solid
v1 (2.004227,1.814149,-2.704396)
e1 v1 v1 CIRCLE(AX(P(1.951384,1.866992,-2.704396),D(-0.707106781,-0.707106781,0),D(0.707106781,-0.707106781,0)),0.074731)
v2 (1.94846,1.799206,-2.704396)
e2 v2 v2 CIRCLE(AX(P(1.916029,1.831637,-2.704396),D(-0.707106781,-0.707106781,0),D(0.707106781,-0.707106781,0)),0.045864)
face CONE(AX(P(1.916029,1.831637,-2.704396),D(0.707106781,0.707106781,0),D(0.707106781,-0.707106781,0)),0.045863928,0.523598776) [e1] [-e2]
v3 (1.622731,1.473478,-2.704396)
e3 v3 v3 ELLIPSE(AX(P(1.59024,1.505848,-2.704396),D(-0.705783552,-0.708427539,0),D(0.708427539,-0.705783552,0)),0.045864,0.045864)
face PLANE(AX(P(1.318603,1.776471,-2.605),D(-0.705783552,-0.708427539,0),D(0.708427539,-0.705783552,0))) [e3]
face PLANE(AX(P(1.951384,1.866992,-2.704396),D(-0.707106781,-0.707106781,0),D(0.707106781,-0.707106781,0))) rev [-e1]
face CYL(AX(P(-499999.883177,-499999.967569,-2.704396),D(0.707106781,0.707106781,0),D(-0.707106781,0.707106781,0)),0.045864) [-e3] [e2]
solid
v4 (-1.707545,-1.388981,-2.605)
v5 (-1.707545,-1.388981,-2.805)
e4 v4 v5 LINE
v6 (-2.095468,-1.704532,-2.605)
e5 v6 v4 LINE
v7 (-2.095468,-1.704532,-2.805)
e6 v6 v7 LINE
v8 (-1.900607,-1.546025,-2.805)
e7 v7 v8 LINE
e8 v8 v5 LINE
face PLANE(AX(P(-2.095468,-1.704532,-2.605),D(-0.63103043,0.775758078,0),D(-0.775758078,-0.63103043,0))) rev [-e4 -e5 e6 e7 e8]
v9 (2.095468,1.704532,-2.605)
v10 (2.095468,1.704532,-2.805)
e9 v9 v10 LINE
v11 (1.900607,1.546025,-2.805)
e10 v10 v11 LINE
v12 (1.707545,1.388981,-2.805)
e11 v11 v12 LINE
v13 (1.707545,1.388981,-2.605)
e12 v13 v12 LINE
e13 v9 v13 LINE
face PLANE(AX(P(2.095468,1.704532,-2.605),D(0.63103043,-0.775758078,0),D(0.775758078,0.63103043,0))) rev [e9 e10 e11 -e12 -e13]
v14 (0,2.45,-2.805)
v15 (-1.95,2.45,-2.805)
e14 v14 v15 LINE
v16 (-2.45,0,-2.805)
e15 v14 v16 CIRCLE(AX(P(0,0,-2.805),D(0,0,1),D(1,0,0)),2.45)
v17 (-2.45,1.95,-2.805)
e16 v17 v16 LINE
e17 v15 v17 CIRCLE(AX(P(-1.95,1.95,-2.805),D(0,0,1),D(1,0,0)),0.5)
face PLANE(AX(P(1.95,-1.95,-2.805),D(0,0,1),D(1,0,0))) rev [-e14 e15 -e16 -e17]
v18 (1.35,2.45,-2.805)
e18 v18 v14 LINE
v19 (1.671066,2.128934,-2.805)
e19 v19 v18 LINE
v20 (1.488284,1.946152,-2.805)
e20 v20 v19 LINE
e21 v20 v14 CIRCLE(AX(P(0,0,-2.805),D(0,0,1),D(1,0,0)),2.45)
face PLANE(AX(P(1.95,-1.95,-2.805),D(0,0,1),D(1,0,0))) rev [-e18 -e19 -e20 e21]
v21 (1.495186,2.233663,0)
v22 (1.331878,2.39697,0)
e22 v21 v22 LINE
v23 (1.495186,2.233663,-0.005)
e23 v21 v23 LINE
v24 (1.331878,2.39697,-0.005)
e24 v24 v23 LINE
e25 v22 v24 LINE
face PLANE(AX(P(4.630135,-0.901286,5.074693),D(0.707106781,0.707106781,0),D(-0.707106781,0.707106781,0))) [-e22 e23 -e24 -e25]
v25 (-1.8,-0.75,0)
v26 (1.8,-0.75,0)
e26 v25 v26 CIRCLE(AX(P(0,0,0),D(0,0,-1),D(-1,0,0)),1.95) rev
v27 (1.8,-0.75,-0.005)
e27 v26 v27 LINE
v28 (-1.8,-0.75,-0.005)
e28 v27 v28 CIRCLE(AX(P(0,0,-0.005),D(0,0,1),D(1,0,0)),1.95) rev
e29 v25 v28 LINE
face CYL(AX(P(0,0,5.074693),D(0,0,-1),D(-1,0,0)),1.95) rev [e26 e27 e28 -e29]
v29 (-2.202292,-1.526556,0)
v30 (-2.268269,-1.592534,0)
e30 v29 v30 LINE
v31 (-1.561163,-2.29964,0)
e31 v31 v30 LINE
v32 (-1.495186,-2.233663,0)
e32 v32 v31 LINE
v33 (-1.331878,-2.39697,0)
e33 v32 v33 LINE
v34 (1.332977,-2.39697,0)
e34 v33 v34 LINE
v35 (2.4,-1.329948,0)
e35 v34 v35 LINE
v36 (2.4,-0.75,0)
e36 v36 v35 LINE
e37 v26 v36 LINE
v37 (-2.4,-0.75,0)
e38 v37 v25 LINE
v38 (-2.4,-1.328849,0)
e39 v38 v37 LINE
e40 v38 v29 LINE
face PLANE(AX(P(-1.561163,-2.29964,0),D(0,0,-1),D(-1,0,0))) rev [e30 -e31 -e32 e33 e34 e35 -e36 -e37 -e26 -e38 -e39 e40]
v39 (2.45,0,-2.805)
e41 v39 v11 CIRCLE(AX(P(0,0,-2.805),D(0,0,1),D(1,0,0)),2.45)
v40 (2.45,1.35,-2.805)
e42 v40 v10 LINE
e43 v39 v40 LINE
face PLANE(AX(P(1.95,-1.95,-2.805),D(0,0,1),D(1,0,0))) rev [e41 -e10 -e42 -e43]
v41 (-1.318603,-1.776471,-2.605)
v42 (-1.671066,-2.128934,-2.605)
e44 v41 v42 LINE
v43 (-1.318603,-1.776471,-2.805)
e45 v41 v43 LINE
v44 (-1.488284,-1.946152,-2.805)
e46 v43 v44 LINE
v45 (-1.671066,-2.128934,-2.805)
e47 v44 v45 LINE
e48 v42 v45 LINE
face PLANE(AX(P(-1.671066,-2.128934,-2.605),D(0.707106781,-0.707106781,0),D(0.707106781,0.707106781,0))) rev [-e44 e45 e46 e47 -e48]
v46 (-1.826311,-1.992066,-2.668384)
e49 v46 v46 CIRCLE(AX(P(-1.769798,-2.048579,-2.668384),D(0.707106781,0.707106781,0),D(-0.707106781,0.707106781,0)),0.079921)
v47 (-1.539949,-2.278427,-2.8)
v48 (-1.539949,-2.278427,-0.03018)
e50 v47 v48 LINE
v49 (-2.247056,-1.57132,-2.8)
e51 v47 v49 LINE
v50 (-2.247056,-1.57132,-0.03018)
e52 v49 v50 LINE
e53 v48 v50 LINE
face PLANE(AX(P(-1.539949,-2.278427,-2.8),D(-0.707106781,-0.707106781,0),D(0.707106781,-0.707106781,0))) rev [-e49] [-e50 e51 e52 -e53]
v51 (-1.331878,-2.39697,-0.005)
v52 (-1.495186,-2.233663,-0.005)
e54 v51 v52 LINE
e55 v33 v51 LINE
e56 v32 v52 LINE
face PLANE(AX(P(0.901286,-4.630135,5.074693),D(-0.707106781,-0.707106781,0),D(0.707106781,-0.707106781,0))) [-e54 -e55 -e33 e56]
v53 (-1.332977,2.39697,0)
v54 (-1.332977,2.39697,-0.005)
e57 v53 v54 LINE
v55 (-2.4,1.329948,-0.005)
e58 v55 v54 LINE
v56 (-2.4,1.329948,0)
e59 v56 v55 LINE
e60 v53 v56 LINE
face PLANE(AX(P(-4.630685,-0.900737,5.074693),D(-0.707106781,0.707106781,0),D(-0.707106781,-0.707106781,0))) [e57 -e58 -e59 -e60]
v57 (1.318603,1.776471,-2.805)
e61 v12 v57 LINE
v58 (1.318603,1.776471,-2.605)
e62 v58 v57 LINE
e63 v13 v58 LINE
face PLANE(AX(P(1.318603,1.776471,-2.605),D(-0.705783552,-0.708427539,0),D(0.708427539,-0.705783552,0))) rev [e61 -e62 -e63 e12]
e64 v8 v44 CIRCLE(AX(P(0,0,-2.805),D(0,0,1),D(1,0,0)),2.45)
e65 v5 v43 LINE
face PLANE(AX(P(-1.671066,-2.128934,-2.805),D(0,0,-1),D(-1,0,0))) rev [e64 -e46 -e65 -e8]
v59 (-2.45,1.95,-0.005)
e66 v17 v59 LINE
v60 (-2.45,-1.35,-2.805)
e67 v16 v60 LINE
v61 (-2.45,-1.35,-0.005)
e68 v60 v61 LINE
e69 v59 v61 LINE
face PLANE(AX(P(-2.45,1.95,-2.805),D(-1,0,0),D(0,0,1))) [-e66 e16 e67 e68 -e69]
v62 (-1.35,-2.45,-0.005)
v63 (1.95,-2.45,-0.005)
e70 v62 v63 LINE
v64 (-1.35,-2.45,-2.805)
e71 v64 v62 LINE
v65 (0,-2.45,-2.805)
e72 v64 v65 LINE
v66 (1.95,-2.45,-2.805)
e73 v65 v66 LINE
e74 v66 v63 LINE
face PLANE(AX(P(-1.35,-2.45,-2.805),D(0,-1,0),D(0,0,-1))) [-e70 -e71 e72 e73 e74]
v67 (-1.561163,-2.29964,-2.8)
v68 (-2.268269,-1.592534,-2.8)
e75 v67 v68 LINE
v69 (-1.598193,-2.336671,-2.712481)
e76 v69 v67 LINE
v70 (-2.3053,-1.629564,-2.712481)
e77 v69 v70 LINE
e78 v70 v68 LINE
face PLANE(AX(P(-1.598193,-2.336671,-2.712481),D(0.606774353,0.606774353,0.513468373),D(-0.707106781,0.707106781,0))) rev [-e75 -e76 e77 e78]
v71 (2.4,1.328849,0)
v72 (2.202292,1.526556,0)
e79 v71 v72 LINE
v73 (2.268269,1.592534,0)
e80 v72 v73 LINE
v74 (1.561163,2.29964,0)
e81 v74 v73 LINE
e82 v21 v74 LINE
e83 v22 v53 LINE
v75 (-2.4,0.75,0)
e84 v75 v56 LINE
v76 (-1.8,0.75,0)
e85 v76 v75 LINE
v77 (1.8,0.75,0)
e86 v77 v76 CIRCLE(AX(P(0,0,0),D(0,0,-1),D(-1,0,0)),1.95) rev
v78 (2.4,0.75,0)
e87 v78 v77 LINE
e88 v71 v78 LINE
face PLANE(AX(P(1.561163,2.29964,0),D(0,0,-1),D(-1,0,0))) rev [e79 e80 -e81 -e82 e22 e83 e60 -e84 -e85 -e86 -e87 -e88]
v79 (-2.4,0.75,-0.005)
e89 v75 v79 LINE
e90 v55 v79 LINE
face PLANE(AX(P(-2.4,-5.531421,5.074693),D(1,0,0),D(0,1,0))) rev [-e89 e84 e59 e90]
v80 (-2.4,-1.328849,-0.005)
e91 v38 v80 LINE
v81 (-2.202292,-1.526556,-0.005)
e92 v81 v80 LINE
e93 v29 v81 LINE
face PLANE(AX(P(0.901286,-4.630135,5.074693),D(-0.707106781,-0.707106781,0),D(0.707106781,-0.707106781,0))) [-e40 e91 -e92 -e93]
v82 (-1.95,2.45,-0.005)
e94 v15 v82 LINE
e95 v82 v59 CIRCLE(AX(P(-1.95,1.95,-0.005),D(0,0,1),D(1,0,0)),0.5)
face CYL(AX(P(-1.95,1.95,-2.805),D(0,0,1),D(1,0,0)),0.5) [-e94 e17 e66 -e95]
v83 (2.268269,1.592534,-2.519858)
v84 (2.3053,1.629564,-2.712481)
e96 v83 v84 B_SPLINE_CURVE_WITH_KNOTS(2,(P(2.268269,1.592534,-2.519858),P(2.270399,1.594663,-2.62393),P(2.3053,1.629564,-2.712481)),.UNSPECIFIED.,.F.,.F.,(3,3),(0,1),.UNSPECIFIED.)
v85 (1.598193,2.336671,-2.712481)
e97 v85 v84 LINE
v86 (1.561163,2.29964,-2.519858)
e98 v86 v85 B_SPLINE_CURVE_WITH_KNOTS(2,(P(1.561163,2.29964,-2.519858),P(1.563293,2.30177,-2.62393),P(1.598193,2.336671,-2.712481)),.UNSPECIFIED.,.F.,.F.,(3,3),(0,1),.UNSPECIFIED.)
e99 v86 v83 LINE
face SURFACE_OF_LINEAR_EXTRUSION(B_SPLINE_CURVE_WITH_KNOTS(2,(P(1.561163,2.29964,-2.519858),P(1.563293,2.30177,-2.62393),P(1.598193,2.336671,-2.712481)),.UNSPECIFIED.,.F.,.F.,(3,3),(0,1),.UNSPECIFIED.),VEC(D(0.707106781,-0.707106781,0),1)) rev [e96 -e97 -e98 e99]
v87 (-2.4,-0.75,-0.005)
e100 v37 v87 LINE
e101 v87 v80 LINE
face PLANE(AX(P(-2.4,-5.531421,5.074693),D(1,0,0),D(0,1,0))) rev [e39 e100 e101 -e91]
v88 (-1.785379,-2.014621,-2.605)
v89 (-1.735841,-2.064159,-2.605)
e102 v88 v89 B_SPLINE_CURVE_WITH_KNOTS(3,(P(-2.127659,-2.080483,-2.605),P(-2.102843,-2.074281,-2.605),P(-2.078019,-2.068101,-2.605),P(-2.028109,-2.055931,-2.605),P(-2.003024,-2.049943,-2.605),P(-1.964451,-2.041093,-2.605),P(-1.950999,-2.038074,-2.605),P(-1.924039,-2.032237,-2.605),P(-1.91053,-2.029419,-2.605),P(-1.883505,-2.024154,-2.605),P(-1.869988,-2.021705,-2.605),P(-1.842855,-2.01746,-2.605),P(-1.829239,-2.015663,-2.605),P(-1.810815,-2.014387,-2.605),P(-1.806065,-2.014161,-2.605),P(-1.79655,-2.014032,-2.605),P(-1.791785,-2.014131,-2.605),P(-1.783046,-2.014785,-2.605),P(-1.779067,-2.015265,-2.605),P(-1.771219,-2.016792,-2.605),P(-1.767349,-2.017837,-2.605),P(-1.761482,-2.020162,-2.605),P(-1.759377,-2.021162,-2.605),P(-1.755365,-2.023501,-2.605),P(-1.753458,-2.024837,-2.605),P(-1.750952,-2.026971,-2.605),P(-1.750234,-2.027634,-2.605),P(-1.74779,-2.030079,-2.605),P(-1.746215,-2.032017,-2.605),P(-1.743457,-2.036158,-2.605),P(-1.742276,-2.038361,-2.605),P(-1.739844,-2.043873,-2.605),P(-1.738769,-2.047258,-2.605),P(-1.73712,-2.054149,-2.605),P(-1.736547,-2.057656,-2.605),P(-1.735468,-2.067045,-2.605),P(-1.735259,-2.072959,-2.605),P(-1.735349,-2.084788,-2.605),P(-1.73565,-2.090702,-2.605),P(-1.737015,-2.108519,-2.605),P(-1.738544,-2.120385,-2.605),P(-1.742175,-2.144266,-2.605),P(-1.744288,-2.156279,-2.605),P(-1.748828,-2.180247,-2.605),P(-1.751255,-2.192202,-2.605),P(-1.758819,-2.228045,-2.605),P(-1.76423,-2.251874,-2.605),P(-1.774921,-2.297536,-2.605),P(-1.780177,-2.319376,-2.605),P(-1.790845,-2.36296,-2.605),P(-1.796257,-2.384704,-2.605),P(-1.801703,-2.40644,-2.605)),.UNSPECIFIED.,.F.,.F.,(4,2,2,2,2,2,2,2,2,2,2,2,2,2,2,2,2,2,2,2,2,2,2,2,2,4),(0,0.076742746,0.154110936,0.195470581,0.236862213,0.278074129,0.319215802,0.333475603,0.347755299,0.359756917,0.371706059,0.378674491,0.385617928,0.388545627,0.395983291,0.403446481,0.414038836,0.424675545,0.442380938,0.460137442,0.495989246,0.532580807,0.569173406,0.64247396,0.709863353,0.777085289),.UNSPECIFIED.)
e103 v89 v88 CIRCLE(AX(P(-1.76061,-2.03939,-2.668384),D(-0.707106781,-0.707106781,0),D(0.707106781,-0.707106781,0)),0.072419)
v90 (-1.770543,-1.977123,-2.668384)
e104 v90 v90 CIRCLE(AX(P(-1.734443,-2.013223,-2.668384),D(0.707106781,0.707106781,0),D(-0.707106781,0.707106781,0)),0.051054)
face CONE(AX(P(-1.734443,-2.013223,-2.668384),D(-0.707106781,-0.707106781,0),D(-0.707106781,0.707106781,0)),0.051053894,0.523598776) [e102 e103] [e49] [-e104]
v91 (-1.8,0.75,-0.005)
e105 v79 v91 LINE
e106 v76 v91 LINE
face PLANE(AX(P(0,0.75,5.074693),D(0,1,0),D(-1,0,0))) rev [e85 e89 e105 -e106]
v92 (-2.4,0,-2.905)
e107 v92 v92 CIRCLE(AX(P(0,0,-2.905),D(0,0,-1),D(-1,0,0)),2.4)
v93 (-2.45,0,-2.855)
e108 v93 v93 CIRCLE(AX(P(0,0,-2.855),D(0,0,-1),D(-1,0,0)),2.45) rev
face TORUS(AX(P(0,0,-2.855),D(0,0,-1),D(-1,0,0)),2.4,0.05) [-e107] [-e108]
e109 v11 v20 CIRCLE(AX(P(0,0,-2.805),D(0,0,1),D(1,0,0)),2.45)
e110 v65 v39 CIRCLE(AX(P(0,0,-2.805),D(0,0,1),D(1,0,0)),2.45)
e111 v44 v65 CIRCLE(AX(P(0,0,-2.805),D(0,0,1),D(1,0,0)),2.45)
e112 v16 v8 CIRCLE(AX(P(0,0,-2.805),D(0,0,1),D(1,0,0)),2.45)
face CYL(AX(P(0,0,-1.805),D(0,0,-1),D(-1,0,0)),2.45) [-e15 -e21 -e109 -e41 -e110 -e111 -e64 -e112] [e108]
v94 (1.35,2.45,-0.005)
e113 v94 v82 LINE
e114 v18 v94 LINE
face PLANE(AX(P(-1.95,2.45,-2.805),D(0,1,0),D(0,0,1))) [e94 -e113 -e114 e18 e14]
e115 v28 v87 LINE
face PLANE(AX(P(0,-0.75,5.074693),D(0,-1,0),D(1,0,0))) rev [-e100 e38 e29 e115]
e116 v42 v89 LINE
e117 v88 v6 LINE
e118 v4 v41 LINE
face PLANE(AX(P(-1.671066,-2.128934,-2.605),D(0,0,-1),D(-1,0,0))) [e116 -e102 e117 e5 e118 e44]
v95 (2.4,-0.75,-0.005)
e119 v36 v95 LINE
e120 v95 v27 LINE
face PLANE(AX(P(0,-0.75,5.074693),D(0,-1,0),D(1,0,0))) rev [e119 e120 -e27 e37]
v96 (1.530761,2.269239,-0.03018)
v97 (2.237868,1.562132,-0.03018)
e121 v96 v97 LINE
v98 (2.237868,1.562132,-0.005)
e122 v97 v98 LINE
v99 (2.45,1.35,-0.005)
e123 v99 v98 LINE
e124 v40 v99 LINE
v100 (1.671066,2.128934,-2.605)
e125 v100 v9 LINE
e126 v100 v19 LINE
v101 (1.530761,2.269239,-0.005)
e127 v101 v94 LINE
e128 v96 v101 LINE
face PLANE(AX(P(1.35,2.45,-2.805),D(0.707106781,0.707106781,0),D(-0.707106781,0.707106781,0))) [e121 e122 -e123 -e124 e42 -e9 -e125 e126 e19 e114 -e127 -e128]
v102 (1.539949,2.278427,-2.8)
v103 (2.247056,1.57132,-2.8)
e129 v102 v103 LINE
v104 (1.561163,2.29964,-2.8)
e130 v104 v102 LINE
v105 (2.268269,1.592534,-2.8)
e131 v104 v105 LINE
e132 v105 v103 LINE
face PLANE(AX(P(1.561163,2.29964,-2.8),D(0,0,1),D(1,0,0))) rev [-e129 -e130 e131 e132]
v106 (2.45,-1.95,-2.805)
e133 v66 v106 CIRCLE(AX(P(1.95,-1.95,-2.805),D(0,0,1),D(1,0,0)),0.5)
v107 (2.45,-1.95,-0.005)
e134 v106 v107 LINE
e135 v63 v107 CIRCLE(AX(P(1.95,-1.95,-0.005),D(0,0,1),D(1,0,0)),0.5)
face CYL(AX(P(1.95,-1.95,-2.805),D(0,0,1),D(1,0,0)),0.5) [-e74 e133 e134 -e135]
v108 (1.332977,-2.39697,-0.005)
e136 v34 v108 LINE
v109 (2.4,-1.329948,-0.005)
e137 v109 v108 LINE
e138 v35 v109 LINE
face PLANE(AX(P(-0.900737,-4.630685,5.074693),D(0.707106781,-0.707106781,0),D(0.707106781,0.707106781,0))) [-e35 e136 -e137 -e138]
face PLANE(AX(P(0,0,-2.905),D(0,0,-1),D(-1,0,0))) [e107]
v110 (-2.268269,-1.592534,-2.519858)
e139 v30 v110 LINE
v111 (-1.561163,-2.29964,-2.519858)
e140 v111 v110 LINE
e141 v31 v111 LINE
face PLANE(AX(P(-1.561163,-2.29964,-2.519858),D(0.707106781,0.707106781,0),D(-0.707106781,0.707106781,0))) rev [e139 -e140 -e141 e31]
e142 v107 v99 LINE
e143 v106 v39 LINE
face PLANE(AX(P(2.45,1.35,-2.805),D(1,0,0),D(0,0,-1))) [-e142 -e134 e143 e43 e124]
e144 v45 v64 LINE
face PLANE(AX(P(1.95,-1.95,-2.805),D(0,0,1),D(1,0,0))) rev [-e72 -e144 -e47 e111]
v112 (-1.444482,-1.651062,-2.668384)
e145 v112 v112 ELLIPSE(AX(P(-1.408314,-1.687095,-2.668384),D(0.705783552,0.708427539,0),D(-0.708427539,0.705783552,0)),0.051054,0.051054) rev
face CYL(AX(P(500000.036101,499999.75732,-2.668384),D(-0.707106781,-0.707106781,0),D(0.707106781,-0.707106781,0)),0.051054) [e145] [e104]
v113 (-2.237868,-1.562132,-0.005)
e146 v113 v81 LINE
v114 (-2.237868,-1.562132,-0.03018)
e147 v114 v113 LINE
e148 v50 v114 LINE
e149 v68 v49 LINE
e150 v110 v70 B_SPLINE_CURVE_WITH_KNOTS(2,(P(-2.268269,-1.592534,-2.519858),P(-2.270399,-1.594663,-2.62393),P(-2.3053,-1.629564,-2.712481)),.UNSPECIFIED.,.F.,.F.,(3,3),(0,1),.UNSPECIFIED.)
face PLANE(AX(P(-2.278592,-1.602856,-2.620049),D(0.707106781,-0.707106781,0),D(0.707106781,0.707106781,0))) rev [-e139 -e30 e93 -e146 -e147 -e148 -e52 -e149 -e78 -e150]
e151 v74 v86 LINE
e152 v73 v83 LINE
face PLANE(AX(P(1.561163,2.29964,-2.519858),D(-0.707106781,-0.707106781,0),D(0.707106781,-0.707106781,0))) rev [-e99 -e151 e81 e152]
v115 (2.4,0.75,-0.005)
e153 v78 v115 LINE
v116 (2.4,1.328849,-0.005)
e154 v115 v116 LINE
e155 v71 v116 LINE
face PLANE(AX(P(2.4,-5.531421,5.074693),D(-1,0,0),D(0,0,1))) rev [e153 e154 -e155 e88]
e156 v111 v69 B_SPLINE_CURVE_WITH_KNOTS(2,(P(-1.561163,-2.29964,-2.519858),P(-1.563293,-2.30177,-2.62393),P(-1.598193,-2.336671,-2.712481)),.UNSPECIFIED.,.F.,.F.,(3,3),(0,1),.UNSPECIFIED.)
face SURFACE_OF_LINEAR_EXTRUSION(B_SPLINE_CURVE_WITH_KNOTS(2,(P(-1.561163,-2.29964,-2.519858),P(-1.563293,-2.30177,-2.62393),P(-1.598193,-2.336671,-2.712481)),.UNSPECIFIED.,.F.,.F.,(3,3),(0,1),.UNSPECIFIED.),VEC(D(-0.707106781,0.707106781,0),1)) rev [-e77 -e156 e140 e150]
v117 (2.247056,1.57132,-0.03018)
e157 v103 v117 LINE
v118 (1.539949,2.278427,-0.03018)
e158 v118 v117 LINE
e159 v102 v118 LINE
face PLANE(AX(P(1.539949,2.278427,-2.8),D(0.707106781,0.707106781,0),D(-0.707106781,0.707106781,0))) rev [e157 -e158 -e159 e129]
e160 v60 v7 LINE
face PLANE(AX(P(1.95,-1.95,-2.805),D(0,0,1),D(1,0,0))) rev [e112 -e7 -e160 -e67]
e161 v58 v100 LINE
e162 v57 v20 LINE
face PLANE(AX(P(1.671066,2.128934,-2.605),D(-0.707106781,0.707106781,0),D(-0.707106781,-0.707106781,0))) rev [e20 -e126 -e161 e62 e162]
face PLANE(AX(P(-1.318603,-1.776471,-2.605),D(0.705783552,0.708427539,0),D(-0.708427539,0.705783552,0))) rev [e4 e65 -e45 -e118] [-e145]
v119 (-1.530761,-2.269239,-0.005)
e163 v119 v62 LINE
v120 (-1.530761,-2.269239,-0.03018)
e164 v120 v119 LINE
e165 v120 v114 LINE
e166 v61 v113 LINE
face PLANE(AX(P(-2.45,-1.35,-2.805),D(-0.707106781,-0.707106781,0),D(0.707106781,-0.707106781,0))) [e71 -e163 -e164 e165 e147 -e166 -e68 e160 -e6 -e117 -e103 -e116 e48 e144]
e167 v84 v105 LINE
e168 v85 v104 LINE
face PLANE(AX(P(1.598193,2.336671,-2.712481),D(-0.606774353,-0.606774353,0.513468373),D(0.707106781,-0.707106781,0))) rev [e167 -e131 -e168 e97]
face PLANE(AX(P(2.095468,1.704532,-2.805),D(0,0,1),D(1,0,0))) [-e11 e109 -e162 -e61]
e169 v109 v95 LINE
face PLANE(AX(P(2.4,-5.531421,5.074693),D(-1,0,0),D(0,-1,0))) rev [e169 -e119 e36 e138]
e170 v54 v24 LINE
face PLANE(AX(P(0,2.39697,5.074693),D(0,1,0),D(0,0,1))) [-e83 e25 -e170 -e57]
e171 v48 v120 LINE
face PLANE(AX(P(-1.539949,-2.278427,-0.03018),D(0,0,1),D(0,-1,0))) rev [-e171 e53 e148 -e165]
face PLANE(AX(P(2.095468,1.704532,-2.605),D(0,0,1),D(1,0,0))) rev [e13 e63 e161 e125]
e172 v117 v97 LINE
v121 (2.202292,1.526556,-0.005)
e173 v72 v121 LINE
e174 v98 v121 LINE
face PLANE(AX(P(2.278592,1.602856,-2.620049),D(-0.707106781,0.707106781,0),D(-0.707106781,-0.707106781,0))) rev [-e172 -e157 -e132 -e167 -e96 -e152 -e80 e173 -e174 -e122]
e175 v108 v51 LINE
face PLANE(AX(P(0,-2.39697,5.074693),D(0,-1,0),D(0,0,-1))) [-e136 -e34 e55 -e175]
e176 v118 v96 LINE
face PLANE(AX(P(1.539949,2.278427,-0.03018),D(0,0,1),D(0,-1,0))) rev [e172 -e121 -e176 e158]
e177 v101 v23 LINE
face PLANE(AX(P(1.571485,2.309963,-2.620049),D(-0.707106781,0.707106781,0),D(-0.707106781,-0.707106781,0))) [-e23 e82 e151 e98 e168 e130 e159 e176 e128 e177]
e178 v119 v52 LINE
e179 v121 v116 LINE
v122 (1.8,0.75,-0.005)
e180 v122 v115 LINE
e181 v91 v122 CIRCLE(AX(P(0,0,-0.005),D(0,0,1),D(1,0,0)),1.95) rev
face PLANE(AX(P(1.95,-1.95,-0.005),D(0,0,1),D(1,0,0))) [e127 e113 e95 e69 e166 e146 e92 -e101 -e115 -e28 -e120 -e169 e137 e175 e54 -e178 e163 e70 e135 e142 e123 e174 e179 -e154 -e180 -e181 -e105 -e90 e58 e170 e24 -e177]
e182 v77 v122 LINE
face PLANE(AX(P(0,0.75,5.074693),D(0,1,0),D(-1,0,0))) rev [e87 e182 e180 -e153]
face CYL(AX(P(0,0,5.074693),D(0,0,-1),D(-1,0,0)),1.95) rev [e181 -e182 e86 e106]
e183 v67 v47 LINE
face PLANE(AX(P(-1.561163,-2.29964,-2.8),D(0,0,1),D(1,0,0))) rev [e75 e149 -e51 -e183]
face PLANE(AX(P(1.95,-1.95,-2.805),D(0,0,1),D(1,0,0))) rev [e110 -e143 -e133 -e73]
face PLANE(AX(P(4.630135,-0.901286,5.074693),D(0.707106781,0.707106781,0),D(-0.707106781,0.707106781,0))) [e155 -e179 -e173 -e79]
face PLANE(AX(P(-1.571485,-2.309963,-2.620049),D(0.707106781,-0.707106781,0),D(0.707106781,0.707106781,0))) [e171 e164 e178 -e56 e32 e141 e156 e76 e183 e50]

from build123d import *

# Parameters (mm, degrees)
EXTRUDE_START             = -0.005
EXTRUDE_1_DEPTH           = 2.8
EXTRUDE_2_DEPTH           = 0.1
EXTRUDE_2_DEPTH_BACK      = 1
SKETCH_2_R                = 2.45
FILLET_1_R                = 0.05
EXTRUDE_START_2           = 0.3
EXTRUDE_6_DEPTH           = 1
CUT_EXTRUDE_8_DEPTH       = 0.2
EXTRUDE_START_3           = 0.05
SKETCH_9_R                = 0.045863928
EXTRUDE_9_DEPTH           = 0.460735
EXTRUDE_9_OTHER_WAY_DEPTH = 0.05
EXTRUDE_9_OTHER_WAY_TAPER = -30
PATTERN_CIRCULAR_3_COUNT  = 2
EXTRUDE_12_DEPTH          = 0.005


# Read off the part's stored shape, not the designer's step: Вытянуть11
with BuildPart() as part:
    # Эскиз1 → Вытянуть1 (new body)
    with BuildSketch(Plane.XY.offset(EXTRUDE_START)):
        with BuildLine():
            Line((-2.45, -1.35), (-1.35, -2.45))
            Line((-1.35, -2.45), (1.95, -2.45))
            ThreePointArc((1.95, -2.45), (2.303553391, -2.303553391), (2.45, -1.95))
            Line((2.45, -1.95), (2.45, 1.35))
            Line((2.45, 1.35), (1.35, 2.45))
            Line((1.35, 2.45), (-1.95, 2.45))
            ThreePointArc((-1.95, 2.45), (-2.303553391, 2.303553391), (-2.45, 1.95))
            Line((-2.45, 1.95), (-2.45, -1.35))
        make_face()
    extrude(amount=-EXTRUDE_1_DEPTH)

    # Эскиз2 → Вытянуть2 (add, two sides: drawn at the far end of the back side and taken through both)
    with BuildSketch(Plane(origin=(0, 0, -2.805), x_dir=(-1, 0, 0), z_dir=(0, 0, -1)).offset(-EXTRUDE_2_DEPTH_BACK)):
        Circle(SKETCH_2_R)
    extrude(amount=EXTRUDE_2_DEPTH + EXTRUDE_2_DEPTH_BACK)

    # Скругление1
    fillet_1_edges = [part.edges().sort_by_distance(p)[0] for p in [
        (2.45, 0, -2.905),
    ]]
    fillet(fillet_1_edges, radius=FILLET_1_R)

    # Эскиз6 → Вытянуть6 (add)
    with BuildSketch(Plane(origin=(0.55, -0.55, 0), x_dir=(0, 0, 1), z_dir=(-0.7071067811865498, 0.7071067811865452, 0)).offset(EXTRUDE_START_2)):
        with BuildLine():
            Line((-2.712480612, 2.782369178), (-2.8, 2.73))
            Line((-2.8, 2.73), (-2.8, 2.7))
            Line((-2.8, 2.7), (-0.030179797, 2.7))
            Line((-0.030179797, 2.7), (-0.030179797, 2.2))
            Line((-0.030179797, 2.2), (0, 2.2))
            Line((0, 2.2), (0, 2.73))
            Line((0, 2.73), (-2.519857711, 2.73))
            add(Edge.make_bspline(
                [(-2.519857711, 2.73), (-2.623929678, 2.733012128), (-2.712480612, 2.782369178)],
                knots=[0, 0, 0, 1, 1, 1], degree=2))
        make_face()
    extrude_6 = extrude(amount=EXTRUDE_6_DEPTH)

    # Эскиз8 → Вытянуть8 (cut)
    with BuildSketch(Plane(origin=(0, 0, -2.805), x_dir=(-1, 0, 0), z_dir=(0, 0, -1))):
        Polygon((-1.67106601, 2.12893399), (-2.095468281, 1.704531719), (-1.707545088, 1.388980588), (-1.318603045, 1.776471025), align=None)
        Polygon((2.095468281, -1.704531719), (1.707545088, -1.388980588), (1.318603045, -1.776471025), (1.67106601, -2.12893399), align=None)
    extrude(amount=-CUT_EXTRUDE_8_DEPTH, mode=Mode.SUBTRACT)

    # Круговой массив3: Вытянуть6 ×2 about axis
    pattern_circular_3_axis = Axis((0, 0, -2.905), (0, 0, 1))
    for i in range(1, PATTERN_CIRCULAR_3_COUNT):
        add(extrude_6.rotate(pattern_circular_3_axis, i * 360 / PATTERN_CIRCULAR_3_COUNT))

    # Вытянуть11 outline → Вытянуть11 (revolve)
    with BuildSketch(Plane(origin=(0.139390265, -0.139390265, -2.66838383), x_dir=(0.7071067811865551, -0.70710678118654, 0), z_dir=(0, 0, 1))):
        Polygon((0, -2.7), (0.079921408, -2.7), (0.051053894, -2.65), (0.051053895, -2.18868786), (0, -2.18868786), align=None)
    revolve(axis=Axis((0.139390265, -0.139390265, -2.66838383), (0.70710678118654, 0.7071067811865551, 0)))

    # Эскиз13 → Вытянуть12 (add)
    with BuildSketch(Plane.XY.offset(-0.005)):
        with BuildLine():
            Line((-2.4, 1.329947834), (-2.4, 0.75))
            Line((-2.4, 0.75), (-1.8, 0.75))
            ThreePointArc((-1.8, 0.75), (0, 1.95), (1.8, 0.75))
            Line((1.8, 0.75), (2.4, 0.75))
            Line((2.4, 0.75), (2.4, 1.328848765))
            Line((2.4, 1.328848765), (1.331878419, 2.396970346))
            Line((1.331878419, 2.396970346), (-1.332977488, 2.396970346))
            Line((-1.332977488, 2.396970346), (-2.4, 1.329947834))
        make_face()
        with BuildLine():
            Line((2.4, -1.329947834), (2.4, -0.75))
            Line((2.4, -0.75), (1.8, -0.75))
            ThreePointArc((1.8, -0.75), (0, -1.95), (-1.8, -0.75))
            Line((-1.8, -0.75), (-2.4, -0.75))
            Line((-2.4, -0.75), (-2.4, -1.328848765))
            Line((-2.4, -1.328848765), (-1.331878419, -2.396970346))
            Line((-1.331878419, -2.396970346), (1.332977488, -2.396970346))
            Line((1.332977488, -2.396970346), (2.4, -1.329947834))
        make_face()
    extrude(amount=EXTRUDE_12_DEPTH)


with BuildPart() as body_2:
    # Эскиз9 → Вытянуть9 (new body)
    with BuildSketch(Plane(origin=(1.909188309, 1.909188309, 0), x_dir=(0, 0, 1), z_dir=(-0.7071067811865452, -0.7071067811865498, 0)).offset(EXTRUDE_START_3)):
        with Locations(Location((-2.704395886, -0.059674036, 0), (0, 0, 270))):
            Circle(SKETCH_9_R)
    extrude(amount=EXTRUDE_9_DEPTH)

    # Эскиз9 → Вытянуть9 other way (add)
    with BuildSketch(Plane(origin=(1.909188309, 1.909188309, 0), x_dir=(0, 0, 1), z_dir=(-0.7071067811865452, -0.7071067811865498, 0)).offset(EXTRUDE_START_3)):
        with Locations(Location((-2.704395886, -0.059674036, 0), (0, 0, 270))):
            Circle(SKETCH_9_R)
    extrude(amount=-EXTRUDE_9_OTHER_WAY_DEPTH, taper=EXTRUDE_9_OTHER_WAY_TAPER)


solid = Compound([part.part, body_2.part])
